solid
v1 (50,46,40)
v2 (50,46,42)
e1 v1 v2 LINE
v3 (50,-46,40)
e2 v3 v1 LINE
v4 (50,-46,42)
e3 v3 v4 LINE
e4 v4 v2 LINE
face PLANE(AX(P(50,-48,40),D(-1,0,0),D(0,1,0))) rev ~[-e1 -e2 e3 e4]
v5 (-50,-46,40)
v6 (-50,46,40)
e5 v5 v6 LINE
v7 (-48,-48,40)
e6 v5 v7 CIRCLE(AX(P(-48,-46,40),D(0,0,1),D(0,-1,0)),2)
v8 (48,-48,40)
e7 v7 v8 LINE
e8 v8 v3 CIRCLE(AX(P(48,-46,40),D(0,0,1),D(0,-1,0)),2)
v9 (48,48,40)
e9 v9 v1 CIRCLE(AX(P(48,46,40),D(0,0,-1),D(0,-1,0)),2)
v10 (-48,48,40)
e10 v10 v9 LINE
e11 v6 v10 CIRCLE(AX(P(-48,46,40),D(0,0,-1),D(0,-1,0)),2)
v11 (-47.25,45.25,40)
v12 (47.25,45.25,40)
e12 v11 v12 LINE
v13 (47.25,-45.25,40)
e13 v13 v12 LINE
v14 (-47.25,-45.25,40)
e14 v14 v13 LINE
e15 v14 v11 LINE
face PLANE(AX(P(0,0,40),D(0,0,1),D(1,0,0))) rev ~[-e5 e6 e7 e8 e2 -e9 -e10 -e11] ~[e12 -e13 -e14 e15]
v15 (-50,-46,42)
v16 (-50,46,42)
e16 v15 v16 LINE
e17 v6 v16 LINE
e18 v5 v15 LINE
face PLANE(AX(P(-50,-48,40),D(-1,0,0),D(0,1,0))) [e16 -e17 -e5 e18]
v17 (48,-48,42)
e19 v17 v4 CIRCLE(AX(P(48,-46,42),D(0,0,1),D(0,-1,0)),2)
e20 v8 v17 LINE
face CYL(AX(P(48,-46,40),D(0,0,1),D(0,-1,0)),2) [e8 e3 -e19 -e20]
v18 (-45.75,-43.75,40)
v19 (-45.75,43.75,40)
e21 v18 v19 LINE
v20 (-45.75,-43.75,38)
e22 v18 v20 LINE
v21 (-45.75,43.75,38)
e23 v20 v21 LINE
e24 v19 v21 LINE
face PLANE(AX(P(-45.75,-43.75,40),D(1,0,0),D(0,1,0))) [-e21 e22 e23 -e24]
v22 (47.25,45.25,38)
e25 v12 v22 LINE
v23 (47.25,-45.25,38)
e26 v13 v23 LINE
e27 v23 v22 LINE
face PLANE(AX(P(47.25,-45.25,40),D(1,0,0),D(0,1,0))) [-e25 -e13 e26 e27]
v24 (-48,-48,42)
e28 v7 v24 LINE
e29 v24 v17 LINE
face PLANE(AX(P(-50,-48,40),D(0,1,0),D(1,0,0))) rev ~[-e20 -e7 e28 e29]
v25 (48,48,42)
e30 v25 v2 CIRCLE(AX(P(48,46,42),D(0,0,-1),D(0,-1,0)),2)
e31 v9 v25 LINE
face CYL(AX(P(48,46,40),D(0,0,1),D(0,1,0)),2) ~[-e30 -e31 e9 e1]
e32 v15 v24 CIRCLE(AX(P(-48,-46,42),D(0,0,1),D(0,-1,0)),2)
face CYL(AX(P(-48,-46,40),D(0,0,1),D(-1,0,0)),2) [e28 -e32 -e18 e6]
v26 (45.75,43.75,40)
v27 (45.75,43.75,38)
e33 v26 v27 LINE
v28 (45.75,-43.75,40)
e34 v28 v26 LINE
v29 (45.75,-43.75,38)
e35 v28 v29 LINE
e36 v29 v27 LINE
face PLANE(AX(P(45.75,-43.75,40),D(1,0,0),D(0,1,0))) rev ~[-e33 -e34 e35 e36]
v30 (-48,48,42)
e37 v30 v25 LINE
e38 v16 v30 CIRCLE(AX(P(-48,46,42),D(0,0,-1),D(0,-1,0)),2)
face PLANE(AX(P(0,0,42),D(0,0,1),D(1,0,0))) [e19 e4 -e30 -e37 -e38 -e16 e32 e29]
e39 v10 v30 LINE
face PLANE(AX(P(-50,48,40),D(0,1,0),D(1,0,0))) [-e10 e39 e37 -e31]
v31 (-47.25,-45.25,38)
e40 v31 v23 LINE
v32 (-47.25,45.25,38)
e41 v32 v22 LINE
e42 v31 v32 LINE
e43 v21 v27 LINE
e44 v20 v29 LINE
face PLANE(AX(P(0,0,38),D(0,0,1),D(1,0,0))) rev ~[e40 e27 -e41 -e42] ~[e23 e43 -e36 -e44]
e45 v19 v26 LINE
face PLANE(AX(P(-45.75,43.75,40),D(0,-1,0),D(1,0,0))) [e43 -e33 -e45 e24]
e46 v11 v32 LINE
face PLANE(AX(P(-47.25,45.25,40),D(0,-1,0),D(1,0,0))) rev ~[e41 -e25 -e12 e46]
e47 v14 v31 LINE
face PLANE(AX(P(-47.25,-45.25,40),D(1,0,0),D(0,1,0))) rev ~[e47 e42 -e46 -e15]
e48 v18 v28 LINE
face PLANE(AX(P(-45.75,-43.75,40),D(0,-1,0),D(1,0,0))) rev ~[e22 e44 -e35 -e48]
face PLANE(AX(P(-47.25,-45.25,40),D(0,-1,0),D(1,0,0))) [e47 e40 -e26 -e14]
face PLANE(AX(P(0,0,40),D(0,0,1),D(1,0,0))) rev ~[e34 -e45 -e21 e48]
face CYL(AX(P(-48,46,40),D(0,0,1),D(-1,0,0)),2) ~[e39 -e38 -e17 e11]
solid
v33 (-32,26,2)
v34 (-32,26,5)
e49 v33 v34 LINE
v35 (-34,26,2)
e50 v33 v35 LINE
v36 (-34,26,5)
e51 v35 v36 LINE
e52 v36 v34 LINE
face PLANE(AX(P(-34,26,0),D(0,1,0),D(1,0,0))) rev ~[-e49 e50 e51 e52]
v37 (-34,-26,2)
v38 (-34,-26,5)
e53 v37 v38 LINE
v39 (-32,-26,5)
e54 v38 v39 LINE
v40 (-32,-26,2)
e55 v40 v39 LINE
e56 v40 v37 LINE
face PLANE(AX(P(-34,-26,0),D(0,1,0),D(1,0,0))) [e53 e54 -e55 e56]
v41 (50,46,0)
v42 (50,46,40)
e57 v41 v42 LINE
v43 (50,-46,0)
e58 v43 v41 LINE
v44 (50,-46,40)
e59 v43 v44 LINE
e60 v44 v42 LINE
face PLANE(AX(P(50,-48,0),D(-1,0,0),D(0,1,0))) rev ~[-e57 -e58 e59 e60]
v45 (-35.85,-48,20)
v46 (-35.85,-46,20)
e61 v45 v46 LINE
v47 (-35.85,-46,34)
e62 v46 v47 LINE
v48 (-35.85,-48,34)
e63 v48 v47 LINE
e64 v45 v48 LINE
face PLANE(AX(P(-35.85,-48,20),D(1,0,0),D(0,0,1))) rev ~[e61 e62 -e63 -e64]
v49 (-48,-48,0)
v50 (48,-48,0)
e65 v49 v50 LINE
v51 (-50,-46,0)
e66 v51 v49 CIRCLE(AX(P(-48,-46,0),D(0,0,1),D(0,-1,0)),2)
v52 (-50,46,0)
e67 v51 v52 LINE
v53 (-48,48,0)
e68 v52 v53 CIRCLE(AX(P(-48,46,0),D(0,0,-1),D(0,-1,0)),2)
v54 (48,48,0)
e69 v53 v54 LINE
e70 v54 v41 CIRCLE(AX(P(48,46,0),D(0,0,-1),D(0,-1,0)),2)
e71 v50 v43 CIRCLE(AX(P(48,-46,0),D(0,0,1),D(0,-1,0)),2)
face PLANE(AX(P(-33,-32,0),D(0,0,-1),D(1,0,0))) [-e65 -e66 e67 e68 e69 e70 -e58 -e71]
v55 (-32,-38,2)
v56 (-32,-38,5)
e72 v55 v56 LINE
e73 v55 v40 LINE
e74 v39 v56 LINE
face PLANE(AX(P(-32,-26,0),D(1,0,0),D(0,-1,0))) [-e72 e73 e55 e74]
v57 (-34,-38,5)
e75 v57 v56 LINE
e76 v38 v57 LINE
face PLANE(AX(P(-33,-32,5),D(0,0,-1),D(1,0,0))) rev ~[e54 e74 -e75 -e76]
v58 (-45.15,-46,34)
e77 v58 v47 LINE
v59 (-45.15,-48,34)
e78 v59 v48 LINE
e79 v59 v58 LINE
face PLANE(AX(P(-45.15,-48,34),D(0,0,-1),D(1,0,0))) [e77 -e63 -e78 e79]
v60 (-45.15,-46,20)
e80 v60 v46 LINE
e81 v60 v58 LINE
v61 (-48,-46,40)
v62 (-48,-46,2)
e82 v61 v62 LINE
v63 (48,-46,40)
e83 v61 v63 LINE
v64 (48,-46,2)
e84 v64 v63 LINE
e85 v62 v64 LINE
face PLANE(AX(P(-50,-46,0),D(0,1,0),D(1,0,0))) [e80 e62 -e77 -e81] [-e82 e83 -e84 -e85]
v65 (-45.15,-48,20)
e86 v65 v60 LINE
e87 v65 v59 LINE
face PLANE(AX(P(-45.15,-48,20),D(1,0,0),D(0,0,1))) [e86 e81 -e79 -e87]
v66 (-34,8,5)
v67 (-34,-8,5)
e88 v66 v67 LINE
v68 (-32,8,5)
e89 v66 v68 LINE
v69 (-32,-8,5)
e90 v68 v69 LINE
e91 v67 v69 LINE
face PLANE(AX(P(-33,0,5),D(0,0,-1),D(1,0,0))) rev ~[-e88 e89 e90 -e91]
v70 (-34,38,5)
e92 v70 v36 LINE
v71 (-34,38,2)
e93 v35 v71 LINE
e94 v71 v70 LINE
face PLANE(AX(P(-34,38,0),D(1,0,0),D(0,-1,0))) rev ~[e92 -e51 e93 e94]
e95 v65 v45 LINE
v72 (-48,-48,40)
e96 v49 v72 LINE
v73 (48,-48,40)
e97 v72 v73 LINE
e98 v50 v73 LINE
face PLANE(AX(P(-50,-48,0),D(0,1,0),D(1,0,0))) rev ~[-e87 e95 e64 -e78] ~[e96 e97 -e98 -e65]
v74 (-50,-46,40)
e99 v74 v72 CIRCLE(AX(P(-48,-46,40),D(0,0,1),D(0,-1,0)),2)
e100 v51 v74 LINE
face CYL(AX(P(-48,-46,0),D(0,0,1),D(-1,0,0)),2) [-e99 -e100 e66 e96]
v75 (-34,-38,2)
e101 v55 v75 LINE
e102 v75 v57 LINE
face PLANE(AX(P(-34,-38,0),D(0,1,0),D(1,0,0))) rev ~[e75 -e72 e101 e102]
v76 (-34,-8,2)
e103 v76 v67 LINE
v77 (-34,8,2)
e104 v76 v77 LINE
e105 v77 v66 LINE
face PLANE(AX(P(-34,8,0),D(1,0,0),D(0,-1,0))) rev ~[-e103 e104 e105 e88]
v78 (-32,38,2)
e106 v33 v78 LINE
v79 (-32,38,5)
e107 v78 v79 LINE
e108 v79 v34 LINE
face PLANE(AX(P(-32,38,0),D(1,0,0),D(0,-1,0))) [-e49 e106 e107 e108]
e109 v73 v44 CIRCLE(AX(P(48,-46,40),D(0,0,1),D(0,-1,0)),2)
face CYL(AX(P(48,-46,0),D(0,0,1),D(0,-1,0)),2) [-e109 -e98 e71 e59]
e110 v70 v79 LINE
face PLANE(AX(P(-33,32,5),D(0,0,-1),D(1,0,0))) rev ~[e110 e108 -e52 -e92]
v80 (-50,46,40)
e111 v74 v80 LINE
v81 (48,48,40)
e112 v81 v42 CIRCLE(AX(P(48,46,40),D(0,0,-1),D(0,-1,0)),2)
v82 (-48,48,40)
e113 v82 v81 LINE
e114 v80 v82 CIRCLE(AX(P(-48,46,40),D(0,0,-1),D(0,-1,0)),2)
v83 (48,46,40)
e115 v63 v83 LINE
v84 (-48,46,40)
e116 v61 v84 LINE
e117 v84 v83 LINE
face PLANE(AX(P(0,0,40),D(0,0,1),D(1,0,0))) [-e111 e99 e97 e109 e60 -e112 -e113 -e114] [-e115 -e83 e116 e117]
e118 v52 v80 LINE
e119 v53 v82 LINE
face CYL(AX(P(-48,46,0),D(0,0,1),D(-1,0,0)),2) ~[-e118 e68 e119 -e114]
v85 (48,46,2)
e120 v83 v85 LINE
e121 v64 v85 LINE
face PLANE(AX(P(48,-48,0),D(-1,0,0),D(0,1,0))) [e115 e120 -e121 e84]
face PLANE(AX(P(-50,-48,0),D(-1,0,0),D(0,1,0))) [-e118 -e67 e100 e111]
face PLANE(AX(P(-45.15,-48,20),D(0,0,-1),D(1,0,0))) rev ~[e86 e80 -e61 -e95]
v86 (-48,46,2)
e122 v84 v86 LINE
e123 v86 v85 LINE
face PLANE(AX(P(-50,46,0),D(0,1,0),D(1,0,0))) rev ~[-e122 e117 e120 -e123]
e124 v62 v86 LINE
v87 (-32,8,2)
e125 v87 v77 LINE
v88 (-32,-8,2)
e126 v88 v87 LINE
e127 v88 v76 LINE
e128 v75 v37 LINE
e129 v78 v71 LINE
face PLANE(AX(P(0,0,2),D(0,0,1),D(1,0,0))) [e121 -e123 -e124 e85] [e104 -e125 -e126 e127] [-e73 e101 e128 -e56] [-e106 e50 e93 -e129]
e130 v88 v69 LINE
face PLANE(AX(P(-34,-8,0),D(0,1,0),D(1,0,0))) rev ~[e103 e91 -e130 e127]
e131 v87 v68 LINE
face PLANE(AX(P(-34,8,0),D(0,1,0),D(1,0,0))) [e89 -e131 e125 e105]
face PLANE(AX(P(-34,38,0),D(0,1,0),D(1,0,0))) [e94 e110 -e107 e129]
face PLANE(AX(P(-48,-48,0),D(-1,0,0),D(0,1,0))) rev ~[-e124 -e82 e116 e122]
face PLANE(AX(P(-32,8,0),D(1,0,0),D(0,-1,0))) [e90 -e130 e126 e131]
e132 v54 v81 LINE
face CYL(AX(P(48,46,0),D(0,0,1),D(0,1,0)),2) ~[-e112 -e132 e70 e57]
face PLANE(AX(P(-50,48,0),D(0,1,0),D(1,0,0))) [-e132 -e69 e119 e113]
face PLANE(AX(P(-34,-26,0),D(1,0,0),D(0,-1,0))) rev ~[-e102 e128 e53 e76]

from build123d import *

# Parameters (mm, degrees)
F0_W      = 100
F0_H      = 96
F1_DEPTH  = 40
F2_T      = -2
F3_W      = 9.3
F3_H      = 14
F4_DEPTH  = 2
F5_W      = 2
F5_H      = 12
F5_H_2    = 16
F6_DEPTH  = 5
F7_R      = 2
F9_W      = 100
F9_H      = 96
F10_DEPTH = 2
F8_W      = 94.5
F8_H      = 90.5
F8_W_2    = 91.5
F8_H_2    = 87.5
F11_DEPTH = 2
F12_R     = 2


# Not quite as in the source:
# - a feature names something its author has since deleted; it is built from what else it names


with BuildPart() as f1:
    # F0 (on Top) → F1 (new body)
    with BuildSketch(Plane.XY):
        Rectangle(F0_W, F0_H)
    extrude(amount=F1_DEPTH)

    # F2
    f2_openings = [f1.faces().sort_by_distance(p)[0] for p in [
        (0, 0, 40),
    ]]
    offset(amount=F2_T, openings=f2_openings)

    # F3 (on face) → F4 (cut, through all)
    with BuildSketch(Plane.XZ.offset(48)):
        with Locations((-40.5, 27)):
            Rectangle(F3_W, F3_H)
    extrude(amount=-F4_DEPTH, mode=Mode.SUBTRACT)

    # F5 (on face) → F6 (join)
    with BuildSketch(Plane(origin=(0, 0, 0), x_dir=(1, 0, 0), z_dir=(0, 0, -1))):
        with Locations((-33, 32)):
            Rectangle(F5_W, F5_H)
        with Locations((-33, 0)):
            Rectangle(F5_W, F5_H_2)
        with Locations((-33, -32)):
            Rectangle(F5_W, F5_H)
    extrude(amount=-F6_DEPTH)

    # F7
    f7_edges = [f1.edges().sort_by_distance(p)[0] for p in [
        (-50, -48, 20),
        (50, -48, 20),
        (50, 48, 20),
        (-50, 48, 20),
    ]]
    fillet(f7_edges, radius=F7_R)


with BuildPart() as f10:
    # F9 (on face) → F10 (new body)
    with BuildSketch(Plane.XY.offset(40)):
        Rectangle(F9_W, F9_H)
    extrude(amount=F10_DEPTH)

    # F8 (on face) → F11 (join)
    with BuildSketch(Plane.XY.offset(40)):
        Rectangle(F8_W, F8_H)
        Rectangle(F8_W_2, F8_H_2, mode=Mode.SUBTRACT)
    extrude(amount=-F11_DEPTH)

    # F12
    f12_edges = [f10.edges().sort_by_distance(p)[0] for p in [
        (-50, -48, 41),
        (50, -48, 41),
        (50, 48, 41),
        (-50, 48, 41),
    ]]
    fillet(f12_edges, radius=F12_R)


solid = Compound([f1.part, f10.part])
